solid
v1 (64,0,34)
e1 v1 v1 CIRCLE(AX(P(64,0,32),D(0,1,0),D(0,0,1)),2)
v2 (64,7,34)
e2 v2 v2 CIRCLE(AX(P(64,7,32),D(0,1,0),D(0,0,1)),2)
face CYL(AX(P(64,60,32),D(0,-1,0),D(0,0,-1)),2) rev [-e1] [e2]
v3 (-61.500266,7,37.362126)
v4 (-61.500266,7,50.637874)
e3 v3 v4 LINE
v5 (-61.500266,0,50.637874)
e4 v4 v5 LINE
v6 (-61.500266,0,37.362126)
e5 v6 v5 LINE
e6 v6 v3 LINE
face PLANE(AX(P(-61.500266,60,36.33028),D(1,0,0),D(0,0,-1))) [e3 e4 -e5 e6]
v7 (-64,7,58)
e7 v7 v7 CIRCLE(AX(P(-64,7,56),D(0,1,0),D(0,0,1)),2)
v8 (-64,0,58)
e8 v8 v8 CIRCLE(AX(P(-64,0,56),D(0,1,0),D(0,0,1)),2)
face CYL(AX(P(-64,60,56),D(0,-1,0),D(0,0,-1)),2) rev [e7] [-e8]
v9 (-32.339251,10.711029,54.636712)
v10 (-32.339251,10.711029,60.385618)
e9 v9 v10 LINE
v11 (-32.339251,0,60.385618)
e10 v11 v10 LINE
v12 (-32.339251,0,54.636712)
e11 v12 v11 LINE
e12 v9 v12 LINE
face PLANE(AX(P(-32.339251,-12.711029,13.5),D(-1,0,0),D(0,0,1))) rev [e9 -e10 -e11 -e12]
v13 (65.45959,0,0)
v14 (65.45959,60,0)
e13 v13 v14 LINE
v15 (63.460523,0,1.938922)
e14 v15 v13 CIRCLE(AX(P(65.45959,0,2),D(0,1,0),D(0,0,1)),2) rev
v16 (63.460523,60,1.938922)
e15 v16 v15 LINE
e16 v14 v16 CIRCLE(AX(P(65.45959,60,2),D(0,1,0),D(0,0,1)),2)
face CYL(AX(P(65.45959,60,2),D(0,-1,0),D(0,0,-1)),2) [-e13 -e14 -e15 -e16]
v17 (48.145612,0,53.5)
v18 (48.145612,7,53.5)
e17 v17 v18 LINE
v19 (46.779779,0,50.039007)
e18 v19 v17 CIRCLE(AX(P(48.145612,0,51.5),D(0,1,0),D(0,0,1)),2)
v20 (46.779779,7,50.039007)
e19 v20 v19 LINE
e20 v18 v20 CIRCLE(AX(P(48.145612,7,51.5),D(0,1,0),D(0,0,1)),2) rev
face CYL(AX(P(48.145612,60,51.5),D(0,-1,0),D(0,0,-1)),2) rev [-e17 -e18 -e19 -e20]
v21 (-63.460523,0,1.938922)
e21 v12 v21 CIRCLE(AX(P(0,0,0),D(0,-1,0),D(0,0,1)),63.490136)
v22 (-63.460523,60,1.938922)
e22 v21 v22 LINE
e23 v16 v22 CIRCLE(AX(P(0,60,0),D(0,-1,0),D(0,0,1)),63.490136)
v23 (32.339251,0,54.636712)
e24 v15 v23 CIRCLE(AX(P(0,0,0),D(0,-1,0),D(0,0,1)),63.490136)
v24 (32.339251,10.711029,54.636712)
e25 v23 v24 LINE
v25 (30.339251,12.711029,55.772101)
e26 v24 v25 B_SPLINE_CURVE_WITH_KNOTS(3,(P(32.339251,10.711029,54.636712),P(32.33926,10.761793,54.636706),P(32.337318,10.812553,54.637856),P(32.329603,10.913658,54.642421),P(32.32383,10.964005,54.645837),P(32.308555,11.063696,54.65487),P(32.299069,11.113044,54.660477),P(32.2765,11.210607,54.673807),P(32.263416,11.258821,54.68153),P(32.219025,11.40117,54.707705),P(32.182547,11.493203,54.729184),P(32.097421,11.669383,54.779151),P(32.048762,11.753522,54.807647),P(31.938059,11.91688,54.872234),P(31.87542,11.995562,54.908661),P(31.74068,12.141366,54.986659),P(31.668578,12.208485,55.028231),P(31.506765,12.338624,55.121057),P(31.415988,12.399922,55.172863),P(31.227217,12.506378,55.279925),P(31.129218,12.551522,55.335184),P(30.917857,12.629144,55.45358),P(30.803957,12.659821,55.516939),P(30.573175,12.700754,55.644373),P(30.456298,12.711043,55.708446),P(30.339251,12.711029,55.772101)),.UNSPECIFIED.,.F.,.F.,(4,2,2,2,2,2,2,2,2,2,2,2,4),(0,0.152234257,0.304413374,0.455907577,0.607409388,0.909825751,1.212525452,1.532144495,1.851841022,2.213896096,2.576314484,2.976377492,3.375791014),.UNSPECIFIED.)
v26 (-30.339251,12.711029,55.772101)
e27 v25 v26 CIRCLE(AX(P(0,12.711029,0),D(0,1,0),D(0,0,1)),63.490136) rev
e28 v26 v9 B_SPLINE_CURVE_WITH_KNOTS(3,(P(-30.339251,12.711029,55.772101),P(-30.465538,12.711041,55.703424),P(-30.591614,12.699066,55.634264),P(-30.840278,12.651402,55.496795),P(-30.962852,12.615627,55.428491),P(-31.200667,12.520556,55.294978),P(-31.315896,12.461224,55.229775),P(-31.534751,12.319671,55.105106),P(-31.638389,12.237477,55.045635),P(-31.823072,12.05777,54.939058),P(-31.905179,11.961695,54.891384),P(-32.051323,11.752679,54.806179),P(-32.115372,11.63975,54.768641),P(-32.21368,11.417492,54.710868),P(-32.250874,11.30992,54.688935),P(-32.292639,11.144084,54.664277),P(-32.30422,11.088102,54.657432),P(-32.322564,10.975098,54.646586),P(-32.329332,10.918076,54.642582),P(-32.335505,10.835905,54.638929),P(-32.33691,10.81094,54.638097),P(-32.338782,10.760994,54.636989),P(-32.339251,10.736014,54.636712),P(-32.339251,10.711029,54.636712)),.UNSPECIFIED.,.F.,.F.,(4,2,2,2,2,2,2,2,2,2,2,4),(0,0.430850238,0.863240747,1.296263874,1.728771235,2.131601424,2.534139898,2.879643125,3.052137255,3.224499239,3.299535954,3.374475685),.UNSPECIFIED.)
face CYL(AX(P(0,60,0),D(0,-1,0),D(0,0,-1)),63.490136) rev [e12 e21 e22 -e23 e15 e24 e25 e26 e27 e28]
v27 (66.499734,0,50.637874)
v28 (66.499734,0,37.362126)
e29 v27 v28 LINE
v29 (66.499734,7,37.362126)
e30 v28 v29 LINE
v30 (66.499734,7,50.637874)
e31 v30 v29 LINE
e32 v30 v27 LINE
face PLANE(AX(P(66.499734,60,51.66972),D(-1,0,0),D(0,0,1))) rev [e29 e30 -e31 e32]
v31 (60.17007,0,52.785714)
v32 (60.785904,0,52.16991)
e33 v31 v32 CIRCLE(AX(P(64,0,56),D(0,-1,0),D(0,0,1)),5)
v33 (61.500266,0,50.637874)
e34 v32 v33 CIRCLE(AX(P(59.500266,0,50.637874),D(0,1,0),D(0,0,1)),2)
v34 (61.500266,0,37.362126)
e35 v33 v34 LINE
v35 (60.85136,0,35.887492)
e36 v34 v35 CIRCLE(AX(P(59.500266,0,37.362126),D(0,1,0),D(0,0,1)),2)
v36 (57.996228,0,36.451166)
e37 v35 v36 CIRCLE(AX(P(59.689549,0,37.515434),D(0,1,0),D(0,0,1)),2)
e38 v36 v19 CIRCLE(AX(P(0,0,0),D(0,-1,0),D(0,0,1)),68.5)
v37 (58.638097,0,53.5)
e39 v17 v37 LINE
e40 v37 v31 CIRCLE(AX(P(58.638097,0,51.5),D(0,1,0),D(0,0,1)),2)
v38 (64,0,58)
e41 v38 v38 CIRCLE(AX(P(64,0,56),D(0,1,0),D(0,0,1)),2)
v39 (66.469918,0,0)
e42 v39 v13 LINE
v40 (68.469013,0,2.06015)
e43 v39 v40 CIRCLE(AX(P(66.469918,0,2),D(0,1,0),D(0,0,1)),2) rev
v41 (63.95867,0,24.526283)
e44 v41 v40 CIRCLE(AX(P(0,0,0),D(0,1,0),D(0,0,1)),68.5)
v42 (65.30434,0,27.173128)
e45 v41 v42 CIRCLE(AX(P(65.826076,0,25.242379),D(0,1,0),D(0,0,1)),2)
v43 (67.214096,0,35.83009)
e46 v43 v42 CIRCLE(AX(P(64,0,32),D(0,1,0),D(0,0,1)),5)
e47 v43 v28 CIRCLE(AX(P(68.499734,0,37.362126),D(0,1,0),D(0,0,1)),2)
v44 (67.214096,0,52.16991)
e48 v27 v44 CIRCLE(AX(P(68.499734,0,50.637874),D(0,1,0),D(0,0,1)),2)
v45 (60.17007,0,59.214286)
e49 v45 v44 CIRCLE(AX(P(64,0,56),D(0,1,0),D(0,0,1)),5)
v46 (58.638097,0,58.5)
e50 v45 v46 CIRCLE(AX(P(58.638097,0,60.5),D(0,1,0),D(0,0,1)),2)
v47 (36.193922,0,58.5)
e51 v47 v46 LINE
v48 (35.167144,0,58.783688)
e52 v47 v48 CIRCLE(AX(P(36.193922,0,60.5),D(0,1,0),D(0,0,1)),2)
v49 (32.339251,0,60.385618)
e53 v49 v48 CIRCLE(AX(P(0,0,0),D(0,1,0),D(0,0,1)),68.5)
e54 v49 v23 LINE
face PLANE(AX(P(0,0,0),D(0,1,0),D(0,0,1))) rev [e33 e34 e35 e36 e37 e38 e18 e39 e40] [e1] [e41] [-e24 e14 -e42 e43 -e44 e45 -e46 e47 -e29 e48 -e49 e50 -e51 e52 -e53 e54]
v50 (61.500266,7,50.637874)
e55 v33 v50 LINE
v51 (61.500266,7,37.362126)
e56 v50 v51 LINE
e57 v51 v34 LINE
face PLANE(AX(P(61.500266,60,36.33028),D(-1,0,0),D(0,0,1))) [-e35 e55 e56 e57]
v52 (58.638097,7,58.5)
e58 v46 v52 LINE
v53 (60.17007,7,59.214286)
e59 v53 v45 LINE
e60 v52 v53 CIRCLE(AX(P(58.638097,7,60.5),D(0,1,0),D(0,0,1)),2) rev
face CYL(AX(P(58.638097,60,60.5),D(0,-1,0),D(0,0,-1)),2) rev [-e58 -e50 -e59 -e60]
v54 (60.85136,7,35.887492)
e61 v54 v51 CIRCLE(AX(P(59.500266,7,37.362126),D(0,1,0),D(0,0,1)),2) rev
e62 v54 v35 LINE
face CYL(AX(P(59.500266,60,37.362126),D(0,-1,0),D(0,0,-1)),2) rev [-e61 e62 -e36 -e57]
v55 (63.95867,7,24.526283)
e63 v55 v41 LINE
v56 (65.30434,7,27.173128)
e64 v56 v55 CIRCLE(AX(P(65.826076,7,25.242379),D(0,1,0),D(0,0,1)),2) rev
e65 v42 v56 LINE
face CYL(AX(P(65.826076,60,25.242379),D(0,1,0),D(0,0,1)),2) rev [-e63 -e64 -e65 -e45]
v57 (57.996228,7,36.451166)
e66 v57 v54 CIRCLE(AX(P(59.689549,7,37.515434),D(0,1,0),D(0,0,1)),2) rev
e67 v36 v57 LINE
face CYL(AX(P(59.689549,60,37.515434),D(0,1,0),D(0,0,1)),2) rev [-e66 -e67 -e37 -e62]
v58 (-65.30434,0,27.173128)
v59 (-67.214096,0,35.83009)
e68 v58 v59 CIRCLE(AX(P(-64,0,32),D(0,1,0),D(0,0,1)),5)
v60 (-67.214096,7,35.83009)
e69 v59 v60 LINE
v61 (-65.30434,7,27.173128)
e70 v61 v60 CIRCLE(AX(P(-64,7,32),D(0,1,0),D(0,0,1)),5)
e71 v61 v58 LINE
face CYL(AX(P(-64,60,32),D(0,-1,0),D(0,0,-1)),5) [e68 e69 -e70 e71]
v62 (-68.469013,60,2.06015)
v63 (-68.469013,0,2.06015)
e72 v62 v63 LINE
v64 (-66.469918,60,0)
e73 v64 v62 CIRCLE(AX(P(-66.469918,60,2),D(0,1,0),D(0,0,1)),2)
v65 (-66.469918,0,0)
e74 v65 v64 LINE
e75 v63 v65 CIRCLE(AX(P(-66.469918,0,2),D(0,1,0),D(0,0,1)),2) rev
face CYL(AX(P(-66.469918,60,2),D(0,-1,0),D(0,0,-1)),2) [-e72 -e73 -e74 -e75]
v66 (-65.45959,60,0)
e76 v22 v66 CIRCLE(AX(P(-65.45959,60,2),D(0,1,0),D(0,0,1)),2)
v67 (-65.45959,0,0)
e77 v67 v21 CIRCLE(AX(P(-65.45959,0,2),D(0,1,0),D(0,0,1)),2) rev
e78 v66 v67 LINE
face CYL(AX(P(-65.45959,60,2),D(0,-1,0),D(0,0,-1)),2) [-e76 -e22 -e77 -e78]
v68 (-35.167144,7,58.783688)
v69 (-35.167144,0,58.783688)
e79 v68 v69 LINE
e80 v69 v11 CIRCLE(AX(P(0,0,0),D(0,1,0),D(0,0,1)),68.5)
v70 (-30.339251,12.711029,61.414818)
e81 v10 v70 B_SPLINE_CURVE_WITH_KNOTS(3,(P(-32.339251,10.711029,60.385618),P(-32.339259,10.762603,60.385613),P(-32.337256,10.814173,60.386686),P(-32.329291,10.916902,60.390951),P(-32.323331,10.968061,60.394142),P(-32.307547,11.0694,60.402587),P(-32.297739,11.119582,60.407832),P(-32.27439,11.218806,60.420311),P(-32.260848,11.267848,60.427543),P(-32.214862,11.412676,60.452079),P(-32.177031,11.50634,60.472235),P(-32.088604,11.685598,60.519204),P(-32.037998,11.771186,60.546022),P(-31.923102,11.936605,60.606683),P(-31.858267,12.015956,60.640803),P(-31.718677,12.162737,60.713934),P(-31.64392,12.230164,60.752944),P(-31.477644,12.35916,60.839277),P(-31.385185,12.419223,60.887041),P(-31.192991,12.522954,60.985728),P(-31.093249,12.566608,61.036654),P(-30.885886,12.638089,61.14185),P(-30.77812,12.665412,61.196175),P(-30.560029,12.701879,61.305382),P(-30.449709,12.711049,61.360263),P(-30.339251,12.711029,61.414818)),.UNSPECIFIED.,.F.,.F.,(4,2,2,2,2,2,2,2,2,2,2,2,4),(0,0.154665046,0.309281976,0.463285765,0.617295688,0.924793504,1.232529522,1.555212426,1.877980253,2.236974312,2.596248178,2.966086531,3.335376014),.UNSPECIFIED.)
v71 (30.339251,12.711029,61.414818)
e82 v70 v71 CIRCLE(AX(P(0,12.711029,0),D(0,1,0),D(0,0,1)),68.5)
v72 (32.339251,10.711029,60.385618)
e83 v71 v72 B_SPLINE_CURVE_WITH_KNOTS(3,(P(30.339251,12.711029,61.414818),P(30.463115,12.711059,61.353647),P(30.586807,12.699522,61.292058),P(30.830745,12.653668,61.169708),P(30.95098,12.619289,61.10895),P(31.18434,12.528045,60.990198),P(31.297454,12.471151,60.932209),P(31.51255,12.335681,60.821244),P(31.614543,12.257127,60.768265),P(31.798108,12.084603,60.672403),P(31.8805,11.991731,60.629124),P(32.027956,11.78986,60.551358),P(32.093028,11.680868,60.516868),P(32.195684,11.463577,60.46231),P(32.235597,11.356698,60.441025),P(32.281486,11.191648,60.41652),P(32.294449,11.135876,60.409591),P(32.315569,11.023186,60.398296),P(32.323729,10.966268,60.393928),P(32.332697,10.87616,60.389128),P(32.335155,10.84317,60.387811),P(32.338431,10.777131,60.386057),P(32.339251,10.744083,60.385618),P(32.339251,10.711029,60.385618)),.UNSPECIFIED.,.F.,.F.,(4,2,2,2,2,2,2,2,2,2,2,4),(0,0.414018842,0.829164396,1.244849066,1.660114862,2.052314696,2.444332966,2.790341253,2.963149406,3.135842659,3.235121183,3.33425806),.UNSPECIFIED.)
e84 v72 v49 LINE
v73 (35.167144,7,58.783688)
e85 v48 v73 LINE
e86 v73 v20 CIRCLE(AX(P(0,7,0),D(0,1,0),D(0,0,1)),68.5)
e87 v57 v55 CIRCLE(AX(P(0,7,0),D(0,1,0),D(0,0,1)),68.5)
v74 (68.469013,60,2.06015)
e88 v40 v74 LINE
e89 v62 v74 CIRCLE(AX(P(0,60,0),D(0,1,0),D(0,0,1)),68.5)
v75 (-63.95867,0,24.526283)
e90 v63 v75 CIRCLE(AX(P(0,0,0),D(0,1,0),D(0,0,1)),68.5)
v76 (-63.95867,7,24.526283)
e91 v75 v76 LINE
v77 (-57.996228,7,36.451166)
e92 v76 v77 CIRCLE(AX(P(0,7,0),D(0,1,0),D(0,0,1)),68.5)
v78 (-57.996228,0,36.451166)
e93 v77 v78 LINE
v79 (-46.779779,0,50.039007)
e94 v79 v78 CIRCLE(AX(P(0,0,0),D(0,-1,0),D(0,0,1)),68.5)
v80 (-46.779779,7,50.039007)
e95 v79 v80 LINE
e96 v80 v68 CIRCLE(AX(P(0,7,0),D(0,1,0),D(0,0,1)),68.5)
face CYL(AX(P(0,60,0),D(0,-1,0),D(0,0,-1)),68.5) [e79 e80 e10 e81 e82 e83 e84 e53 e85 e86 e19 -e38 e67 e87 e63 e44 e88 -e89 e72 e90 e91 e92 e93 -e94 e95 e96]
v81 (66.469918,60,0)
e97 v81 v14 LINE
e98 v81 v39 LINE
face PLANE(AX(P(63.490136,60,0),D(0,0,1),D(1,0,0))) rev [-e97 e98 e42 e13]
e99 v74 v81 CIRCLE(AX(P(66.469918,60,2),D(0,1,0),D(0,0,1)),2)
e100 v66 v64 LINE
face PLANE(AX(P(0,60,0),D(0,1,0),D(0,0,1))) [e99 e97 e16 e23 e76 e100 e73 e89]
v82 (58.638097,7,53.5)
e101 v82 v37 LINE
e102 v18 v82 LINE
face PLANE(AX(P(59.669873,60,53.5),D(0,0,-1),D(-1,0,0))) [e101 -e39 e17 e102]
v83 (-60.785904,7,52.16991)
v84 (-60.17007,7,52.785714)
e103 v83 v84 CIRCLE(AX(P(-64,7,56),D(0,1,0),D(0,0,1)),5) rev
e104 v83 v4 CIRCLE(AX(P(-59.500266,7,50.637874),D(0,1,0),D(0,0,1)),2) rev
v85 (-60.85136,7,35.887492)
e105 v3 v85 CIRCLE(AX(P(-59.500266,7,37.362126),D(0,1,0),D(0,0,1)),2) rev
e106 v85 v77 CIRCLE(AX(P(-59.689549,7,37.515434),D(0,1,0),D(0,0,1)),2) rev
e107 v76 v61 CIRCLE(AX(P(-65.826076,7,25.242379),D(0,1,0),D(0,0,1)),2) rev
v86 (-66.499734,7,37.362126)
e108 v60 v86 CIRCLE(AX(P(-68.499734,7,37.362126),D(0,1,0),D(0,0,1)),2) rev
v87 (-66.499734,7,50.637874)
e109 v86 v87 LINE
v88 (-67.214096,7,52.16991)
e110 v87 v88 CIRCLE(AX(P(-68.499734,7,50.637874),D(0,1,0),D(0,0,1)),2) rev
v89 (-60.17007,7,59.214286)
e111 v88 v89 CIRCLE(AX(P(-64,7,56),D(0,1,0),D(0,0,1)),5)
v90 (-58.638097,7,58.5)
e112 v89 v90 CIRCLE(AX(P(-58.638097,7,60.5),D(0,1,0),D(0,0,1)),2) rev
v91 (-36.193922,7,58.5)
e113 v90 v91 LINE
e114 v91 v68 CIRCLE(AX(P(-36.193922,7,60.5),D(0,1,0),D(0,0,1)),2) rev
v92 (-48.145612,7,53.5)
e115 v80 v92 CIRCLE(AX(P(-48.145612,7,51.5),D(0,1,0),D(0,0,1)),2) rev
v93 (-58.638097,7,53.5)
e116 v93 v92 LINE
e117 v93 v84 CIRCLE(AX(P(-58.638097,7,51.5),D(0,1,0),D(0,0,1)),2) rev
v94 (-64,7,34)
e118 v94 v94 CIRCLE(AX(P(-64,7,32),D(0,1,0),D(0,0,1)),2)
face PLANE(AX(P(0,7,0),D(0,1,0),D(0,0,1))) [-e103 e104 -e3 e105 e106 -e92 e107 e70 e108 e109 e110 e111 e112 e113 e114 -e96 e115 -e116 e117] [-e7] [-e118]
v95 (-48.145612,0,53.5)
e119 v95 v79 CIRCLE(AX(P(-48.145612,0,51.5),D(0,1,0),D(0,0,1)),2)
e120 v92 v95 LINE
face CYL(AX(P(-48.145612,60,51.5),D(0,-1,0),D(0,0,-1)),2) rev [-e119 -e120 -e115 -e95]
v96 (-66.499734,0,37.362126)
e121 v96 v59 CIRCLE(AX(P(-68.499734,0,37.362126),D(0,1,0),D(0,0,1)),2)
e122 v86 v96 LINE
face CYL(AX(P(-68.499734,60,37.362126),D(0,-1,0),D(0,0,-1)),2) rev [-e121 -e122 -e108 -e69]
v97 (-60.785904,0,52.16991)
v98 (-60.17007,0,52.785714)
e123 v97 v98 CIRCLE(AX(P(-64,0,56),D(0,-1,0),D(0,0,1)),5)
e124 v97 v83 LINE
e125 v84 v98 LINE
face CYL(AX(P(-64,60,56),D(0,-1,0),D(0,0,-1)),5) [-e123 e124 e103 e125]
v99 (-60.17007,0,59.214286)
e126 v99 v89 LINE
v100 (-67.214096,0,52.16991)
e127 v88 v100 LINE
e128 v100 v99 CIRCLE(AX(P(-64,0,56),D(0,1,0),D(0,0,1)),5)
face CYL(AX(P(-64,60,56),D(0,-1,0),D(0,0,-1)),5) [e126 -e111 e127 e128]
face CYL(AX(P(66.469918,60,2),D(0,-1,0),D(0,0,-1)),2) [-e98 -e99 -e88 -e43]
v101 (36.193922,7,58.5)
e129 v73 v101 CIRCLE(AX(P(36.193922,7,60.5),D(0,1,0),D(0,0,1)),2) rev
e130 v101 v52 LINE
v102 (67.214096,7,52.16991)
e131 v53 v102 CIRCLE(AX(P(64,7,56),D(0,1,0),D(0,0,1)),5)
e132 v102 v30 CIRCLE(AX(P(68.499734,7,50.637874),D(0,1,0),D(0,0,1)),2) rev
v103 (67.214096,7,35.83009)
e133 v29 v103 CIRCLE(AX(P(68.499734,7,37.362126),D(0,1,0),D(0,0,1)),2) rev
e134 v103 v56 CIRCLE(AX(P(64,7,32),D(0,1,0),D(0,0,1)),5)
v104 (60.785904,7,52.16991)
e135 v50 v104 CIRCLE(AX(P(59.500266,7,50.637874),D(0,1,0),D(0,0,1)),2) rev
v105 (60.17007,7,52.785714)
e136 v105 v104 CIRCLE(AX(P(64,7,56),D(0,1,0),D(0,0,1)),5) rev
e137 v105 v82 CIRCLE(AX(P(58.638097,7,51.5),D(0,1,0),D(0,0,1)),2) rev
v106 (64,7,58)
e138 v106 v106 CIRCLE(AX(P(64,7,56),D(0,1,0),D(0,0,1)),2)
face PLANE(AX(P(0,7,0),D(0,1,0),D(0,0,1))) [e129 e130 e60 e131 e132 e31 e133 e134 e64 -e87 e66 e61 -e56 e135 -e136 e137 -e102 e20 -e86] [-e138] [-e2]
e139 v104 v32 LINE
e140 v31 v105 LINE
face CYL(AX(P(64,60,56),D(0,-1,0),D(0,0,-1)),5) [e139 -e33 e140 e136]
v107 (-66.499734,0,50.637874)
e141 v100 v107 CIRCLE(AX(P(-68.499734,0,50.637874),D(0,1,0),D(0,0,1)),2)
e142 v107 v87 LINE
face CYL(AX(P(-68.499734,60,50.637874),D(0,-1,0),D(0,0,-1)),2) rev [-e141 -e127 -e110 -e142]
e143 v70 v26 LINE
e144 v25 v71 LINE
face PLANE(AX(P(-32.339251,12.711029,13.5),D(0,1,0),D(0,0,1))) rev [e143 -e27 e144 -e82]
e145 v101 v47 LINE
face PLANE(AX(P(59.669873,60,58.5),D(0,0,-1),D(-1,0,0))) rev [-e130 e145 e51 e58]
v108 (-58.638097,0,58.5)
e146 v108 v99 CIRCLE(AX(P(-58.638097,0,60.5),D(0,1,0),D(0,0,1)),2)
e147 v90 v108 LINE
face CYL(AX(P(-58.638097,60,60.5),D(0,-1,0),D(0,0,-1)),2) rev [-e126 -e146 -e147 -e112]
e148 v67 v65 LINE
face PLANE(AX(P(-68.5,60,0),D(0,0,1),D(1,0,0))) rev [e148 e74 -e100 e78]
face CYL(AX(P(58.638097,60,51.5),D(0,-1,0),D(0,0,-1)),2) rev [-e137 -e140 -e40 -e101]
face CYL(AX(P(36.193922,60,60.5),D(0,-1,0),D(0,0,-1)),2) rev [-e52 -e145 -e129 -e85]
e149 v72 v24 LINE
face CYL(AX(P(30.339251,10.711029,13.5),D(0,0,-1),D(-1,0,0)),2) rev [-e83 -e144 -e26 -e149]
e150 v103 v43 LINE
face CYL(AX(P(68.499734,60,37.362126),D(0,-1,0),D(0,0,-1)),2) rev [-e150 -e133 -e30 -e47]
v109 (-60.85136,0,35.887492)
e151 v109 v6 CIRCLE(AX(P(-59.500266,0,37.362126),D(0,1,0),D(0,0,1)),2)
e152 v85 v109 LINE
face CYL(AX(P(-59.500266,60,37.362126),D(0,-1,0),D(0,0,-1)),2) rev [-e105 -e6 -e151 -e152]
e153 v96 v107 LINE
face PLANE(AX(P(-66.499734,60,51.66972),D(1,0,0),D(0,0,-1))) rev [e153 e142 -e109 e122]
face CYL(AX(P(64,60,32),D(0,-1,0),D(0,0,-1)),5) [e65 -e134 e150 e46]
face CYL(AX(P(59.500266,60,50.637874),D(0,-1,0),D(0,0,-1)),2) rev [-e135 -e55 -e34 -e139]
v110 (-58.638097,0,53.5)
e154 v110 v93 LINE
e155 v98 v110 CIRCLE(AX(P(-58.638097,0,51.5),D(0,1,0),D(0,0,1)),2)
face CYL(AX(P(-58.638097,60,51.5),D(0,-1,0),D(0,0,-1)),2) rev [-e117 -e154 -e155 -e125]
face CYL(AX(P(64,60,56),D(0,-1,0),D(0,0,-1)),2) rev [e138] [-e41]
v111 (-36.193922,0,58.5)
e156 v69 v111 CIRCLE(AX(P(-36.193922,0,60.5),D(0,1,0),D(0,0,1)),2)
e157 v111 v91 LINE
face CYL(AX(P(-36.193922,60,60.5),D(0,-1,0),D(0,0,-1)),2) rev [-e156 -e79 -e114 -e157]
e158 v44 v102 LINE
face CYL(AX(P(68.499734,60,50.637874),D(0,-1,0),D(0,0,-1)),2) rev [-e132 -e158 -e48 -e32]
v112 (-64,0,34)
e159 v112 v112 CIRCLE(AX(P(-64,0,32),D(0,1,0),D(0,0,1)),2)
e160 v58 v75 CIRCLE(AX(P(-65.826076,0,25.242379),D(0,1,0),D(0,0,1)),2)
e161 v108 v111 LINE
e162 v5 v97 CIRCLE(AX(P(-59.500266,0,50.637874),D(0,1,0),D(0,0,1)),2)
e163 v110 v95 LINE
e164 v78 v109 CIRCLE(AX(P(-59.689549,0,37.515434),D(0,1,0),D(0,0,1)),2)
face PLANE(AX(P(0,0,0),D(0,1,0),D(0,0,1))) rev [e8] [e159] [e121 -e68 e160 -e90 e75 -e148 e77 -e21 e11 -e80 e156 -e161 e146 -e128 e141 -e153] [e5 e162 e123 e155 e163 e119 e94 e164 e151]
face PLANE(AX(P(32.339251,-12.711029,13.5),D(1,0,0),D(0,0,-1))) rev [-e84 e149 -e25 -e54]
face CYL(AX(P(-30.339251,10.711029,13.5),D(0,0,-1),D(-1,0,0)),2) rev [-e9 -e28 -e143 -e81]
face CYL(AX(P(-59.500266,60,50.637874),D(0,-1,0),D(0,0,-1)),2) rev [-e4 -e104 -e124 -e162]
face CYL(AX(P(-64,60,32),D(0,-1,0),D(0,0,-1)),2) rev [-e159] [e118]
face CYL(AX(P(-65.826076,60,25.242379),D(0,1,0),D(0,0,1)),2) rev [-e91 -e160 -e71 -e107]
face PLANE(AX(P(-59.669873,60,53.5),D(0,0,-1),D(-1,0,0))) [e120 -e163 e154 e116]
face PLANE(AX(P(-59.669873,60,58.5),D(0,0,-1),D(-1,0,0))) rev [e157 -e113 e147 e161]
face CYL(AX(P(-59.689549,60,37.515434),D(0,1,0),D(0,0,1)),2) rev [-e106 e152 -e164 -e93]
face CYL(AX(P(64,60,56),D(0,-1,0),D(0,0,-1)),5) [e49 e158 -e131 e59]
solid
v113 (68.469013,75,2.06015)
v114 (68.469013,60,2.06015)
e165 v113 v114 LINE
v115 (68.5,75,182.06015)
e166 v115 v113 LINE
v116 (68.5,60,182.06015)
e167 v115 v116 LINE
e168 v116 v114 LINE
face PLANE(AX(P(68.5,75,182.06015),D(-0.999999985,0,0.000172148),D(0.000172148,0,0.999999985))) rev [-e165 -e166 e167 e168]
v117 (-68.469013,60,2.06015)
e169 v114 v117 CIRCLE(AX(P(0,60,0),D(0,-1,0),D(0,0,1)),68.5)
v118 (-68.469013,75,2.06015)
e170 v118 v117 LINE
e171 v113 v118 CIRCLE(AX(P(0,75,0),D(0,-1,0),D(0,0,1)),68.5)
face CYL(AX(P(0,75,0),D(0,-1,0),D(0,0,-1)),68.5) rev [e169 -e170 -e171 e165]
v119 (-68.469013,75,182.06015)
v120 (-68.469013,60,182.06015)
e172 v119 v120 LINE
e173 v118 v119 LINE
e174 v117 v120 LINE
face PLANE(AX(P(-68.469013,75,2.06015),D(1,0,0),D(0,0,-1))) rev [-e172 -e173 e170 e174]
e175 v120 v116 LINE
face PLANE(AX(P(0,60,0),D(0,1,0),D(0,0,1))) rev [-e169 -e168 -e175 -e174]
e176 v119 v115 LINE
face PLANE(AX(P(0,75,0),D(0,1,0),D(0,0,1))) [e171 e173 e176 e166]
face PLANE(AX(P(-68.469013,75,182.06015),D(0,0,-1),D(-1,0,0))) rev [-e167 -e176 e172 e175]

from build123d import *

# Parameters (mm, degrees)
SKETCH1_R           = 2
BOSS_EXTRUDE1_DEPTH = 60
CUT_EXTRUDE1_START  = -53
SKETCH2_R           = 90.041166502
SKETCH2_R_2         = 68.5
CUT_EXTRUDE1_DEPTH  = 53
SKETCH3_W           = 64.67850159
SKETCH3_H           = 25.422058074
CUT_EXTRUDE2_DEPTH  = 55
FILLET1_R           = 2
BOSS_EXTRUDE2_DEPTH = 15


with BuildPart() as part:
    # Sketch1 → Boss-Extrude1 (new body)
    with BuildSketch(Plane(origin=(0, 0, 0), x_dir=(1, 0, 0), z_dir=(0, 1, 0))):
        with BuildLine():
            Line((63.490136384, 0), (68.5, 0))
            ThreePointArc((68.5, 0), (67.085865229, -13.846901692), (62.90184857, -27.122084109))
            ThreePointArc((62.90184857, -27.122084109), (68.657126641, -30.180337544), (66.499734232, -36.330280449))
            Line((66.499734232, -36.330280449), (66.499734232, -51.669719551))
            ThreePointArc((66.499734232, -51.669719551), (67.535642402, -59.535425407), (59.669872981, -58.5))
            Line((59.669872981, -58.5), (35.637059362, -58.5))
            ThreePointArc((35.637059362, -58.5), (0, -68.5), (-35.637059362, -58.5))
            Line((-35.637059362, -58.5), (-59.669872981, -58.5))
            ThreePointArc((-59.669872981, -58.5), (-67.535642402, -59.535425407), (-66.499734232, -51.669719551))
            Line((-66.499734232, -51.669719551), (-66.499734232, -36.330280449))
            ThreePointArc((-66.499734232, -36.330280449), (-68.657126641, -30.180337544), (-62.90184857, -27.122084109))
            ThreePointArc((-62.90184857, -27.122084109), (-67.085865229, -13.846901692), (-68.5, 0))
            Line((-68.5, 0), (-63.490136384, 0))
            ThreePointArc((-63.490136384, 0), (0, -63.490136384), (63.490136384, 0))
        make_face()
        with Locations(Location((-64, -32, 0), (0, 0, 270))):
            Circle(SKETCH1_R, mode=Mode.SUBTRACT)
        with Locations(Location((64, -32, 0), (0, 0, 270))):
            Circle(SKETCH1_R, mode=Mode.SUBTRACT)
        with Locations(Location((64, -56, 0), (0, 0, 270))):
            Circle(SKETCH1_R, mode=Mode.SUBTRACT)
        with Locations(Location((-64, -56, 0), (0, 0, 270))):
            Circle(SKETCH1_R, mode=Mode.SUBTRACT)
        with BuildLine():
            Line((61.500265768, -36.330280449), (61.500265768, -51.669719551))
            ThreePointArc((61.500265768, -51.669719551), (60.464574593, -52.464357598), (59.669872981, -53.5))
            Line((59.669872981, -53.5), (42.778499272, -53.5))
            ThreePointArc((42.778499272, -53.5), (52.025817799, -44.55967103), (59.43877643, -34.048228391))
            ThreePointArc((59.43877643, -34.048228391), (60.289714071, -35.35168291), (61.500265768, -36.330280449))
        make_face(mode=Mode.SUBTRACT)
        with BuildLine():
            Line((-59.669872981, -53.5), (-42.778499272, -53.5))
            ThreePointArc((-42.778499272, -53.5), (-52.025817799, -44.55967103), (-59.43877643, -34.048228391))
            ThreePointArc((-59.43877643, -34.048228391), (-60.289714071, -35.35168291), (-61.500265768, -36.330280449))
            Line((-61.500265768, -36.330280449), (-61.500265768, -51.669719551))
            ThreePointArc((-61.500265768, -51.669719551), (-60.464574593, -52.464357598), (-59.669872981, -53.5))
        make_face(mode=Mode.SUBTRACT)
    extrude(amount=BOSS_EXTRUDE1_DEPTH)

    # Sketch2 → Cut-Extrude1 (cut)
    with BuildSketch(Plane(origin=(0, 60, 0), x_dir=(1, 0, 0), z_dir=(0, 1, 0)).offset(CUT_EXTRUDE1_START)):
        Circle(SKETCH2_R)
        Circle(SKETCH2_R_2, mode=Mode.SUBTRACT)
    extrude(amount=CUT_EXTRUDE1_DEPTH, mode=Mode.SUBTRACT)

    # Sketch3 → Cut-Extrude2 (cut)
    with BuildSketch(Plane(origin=(0, 60, 68.5), x_dir=(1, 0, 0), z_dir=(0, 0, 1))):
        with Locations((0, -60)):
            Rectangle(SKETCH3_W, SKETCH3_H)
    extrude(amount=-CUT_EXTRUDE2_DEPTH, mode=Mode.SUBTRACT)

    # Fillet1
    # the kernel refuses this fillet: 2 mm, written as the material it adds along each edge
    with BuildSketch(Plane(origin=(62.90184857, 0, 27.122084109), x_dir=(0.9997743783027363, 0, 0.02124129208351232), z_dir=(0, 1, 0))) as fillet1_piece_1:
        with BuildLine():
            CenterArc((2.883640558, 1.941395669), FILLET1_R, 160.236767208, 95.858786022)
            ThreePointArc((1.001444665, 2.617663827), (0.514111494, 1.303709596), (0, 0))
            ThreePointArc((0, 0), (1.201516899, 0.146510828), (2.403033798, 0))
        make_face()
    extrude(amount=7)
    with BuildSketch(Plane(origin=(66.499734232, 0, 36.330280449), x_dir=(0.8191578281035011, 0, -0.5735681761192429), z_dir=(0, 1, 0)), Plane(origin=(-66.499734232, 0, 51.669719551), x_dir=(-0.8191578281038059, 0, 0.5735681761188076), z_dir=(0, 1, 0))) as fillet1_piece_2:
        with BuildLine():
            CenterArc((1.046482067, -1.992380453), FILLET1_R, 95.002938786, 49.997638975)
            Line((-0.591833589, -0.845244101), (0, 0))
            ThreePointArc((0, 0), (0.436034195, -0.019048868), (0.87206839, 0))
        make_face()
    extrude(amount=7)
    with BuildSketch(Plane(origin=(66.499734232, 0, 51.669719551), x_dir=(0, 0, -1), z_dir=(0, 1, 0)), Plane(origin=(-66.499734232, 0, 36.330280449), x_dir=(0, 0, 1), z_dir=(0, 1, 0))) as fillet1_piece_3:
        with BuildLine():
            CenterArc((1.031845234, -2), FILLET1_R, 90, 49.997638975)
            ThreePointArc((-0.500190676, -0.714361648), (-0.234491309, -0.368106648), (0, 0))
            Line((0, 0), (1.031845234, 0))
        make_face()
    extrude(amount=7)
    with BuildSketch(Plane(origin=(59.669872981, 0, 58.5), x_dir=(0.5736136140260999, 0, 0.8191260109433204), z_dir=(0, 1, 0))) as fillet1_piece_4:
        with BuildLine():
            CenterArc((1.046411475, -1.992381483), FILLET1_R, 95.002600442, 49.994799115)
            Line((-0.591840547, -0.845154255), (0, 0))
            ThreePointArc((0, 0), (0.436004781, -0.019046293), (0.872009562, 0))
        make_face()
    extrude(amount=7)
    with BuildSketch(Plane(origin=(35.637059362, 0, 58.5), x_dir=(1, 0, 0), z_dir=(0, 1, 0))) as fillet1_piece_5:
        with BuildLine():
            CenterArc((0.556862779, -2), FILLET1_R, 90, 30.889831942)
            ThreePointArc((-0.469915154, -0.283687943), (-0.234673418, -0.142314667), (0, 0))
            Line((0, 0), (0.556862779, 0))
        make_face()
    extrude(amount=7)
    with BuildSketch(Plane(origin=(-35.637059362, 0, 58.5), x_dir=(0.85609218491347, 0, 0.5168231524710181), z_dir=(0, 1, 0))) as fillet1_piece_6:
        with BuildLine():
            CenterArc((0.556920432, -1.999983947), FILLET1_R, 90.229563134, 30.889831942)
            Line((-0.476725873, -0.287799577), (0, 0))
            ThreePointArc((0, 0), (0.274453594, -0.000549818), (0.548907188, 0))
        make_face()
    extrude(amount=7)
    with BuildSketch(Plane(origin=(-59.669872981, 0, 58.5), x_dir=(1, 0, 0), z_dir=(0, 1, 0))) as fillet1_piece_7:
        with BuildLine():
            CenterArc((1.031775628, -2), FILLET1_R, 90, 49.994799115)
            ThreePointArc((-0.500196557, -0.714285714), (-0.234496964, -0.36806807), (0, 0))
            Line((0, 0), (1.031775628, 0))
        make_face()
    extrude(amount=7)
    with BuildSketch(Plane(origin=(-62.90184857, 0, 27.122084109), x_dir=(-0.3770742927095456, 0, -0.9261830152716016), z_dir=(0, 1, 0))) as fillet1_piece_8:
        with BuildLine():
            CenterArc((2.843602303, 1.999581444), FILLET1_R, 172.968999754, 95.858786022)
            ThreePointArc((0.858642167, 2.244394142), (0.566159793, 1.069846424), (0, 0))
            ThreePointArc((0, 0), (1.401343581, 0.014335543), (2.802687162, 0))
        make_face()
    extrude(amount=7)
    with BuildSketch(Plane(origin=(32.339250795, 12.711029037, 65.385617973), x_dir=(-1, 0, 0), z_dir=(0, 0, -1))) as fillet1_piece_9_section:
        with BuildLine():
            CenterArc((FILLET1_R, -FILLET1_R), FILLET1_R, 90, 90)
            Line((0, -FILLET1_R), (0, 0))
            Line((0, 0), (FILLET1_R, 0))
        make_face()
    fillet1_piece_9 = extrude(amount=15.748906176, mode=Mode.PRIVATE)
    fillet1_piece_9 = fillet1_piece_9 & Plane(origin=(0, 12.25719498, 0), x_dir=(1, 0, 0), z_dir=(0, -1, 0)) * Cylinder(68.5, 40, mode=Mode.PRIVATE)
    fillet1_piece_9 = fillet1_piece_9 - Plane(origin=(0, 12.25719498, 0), x_dir=(-1, 0, 0), z_dir=(0, -1, 0)) * Cylinder(63.490136384, 40, mode=Mode.PRIVATE)
    add(fillet1_piece_9)
    with BuildSketch(Plane(origin=(-32.339250795, 12.711029037, 65.385617973), x_dir=(1, 0, 0), z_dir=(0, 0, -1))) as fillet1_piece_10_section:
        with BuildLine():
            CenterArc((FILLET1_R, FILLET1_R), FILLET1_R, 180, 90)
            Line((0, FILLET1_R), (0, 0))
            Line((0, 0), (FILLET1_R, 0))
        make_face()
    fillet1_piece_10 = extrude(amount=15.748906176, mode=Mode.PRIVATE)
    fillet1_piece_10 = fillet1_piece_10 & Plane(origin=(0, 12.25719498, 0), x_dir=(1, 0, 0), z_dir=(0, -1, 0)) * Cylinder(68.5, 40, mode=Mode.PRIVATE)
    fillet1_piece_10 = fillet1_piece_10 - Plane(origin=(0, 12.25719498, 0), x_dir=(-1, 0, 0), z_dir=(0, -1, 0)) * Cylinder(63.490136384, 40, mode=Mode.PRIVATE)
    add(fillet1_piece_10)
    with BuildSketch(Plane(origin=(-61.500265768, 0, 36.330280449), x_dir=(0, 0, 1), z_dir=(0, 1, 0)), Plane(origin=(61.500265768, 0, 51.669719551), x_dir=(0, 0, -1), z_dir=(0, 1, 0))) as fillet1_piece_11:
        with BuildLine():
            CenterArc((1.031845234, 2), FILLET1_R, 220.002361025, 49.997638975)
            ThreePointArc((-0.500190676, 0.714361648), (-0.234491309, 0.368106648), (0, 0))
            Line((0, 0), (1.031845234, 0))
        make_face()
    extrude(amount=7)
    with BuildSketch(Plane(origin=(-61.500265768, 0, 51.669719551), x_dir=(0.8191578281038006, 0, 0.5735681761188153), z_dir=(0, 1, 0)), Plane(origin=(61.500265768, 0, 36.330280449), x_dir=(-0.8191578281034525, 0, -0.5735681761193124), z_dir=(0, 1, 0))) as fillet1_piece_12:
        with BuildLine():
            CenterArc((1.046482067, 1.992380453), FILLET1_R, 214.999422238, 49.997638975)
            Line((-0.591833589, 0.845244101), (0, 0))
            ThreePointArc((0, 0), (0.436034195, 0.019048868), (0.87206839, 0))
        make_face()
    extrude(amount=7)
    with BuildSketch(Plane(origin=(-59.43877643, 0, 34.048228391), x_dir=(0.514701836591563, 0, 0.8573692433305922), z_dir=(0, 1, 0))) as fillet1_piece_13:
        with BuildLine():
            CenterArc((2.843602303, -1.999581444), FILLET1_R, 91.172214224, 95.858786022)
            ThreePointArc((0.858642167, -2.244394142), (0.566159793, -1.069846424), (0, 0))
            ThreePointArc((0, 0), (1.401343581, -0.014335543), (2.802687162, 0))
        make_face()
    extrude(amount=7)
    with BuildSketch(Plane(origin=(-42.778499272, 0, 53.5), x_dir=(-0.7563233086110386, 0, -0.6541980226595399), z_dir=(0, 1, 0))) as fillet1_piece_14:
        with BuildLine():
            CenterArc((5.367668856, 1.998508223), FILLET1_R, 130.858867725, 136.928029694)
            Line((4.05927281, 3.51115484), (0, 0))
            ThreePointArc((0, 0), (2.645218105, 0.051093353), (5.29043621, 0))
        make_face()
    extrude(amount=7)
    with BuildSketch(Plane(origin=(-59.669872981, 0, 53.5), x_dir=(1, 0, 0), z_dir=(0, 1, 0))) as fillet1_piece_15:
        with BuildLine():
            CenterArc((1.031775628, 2), FILLET1_R, 220.005200885, 49.994799115)
            ThreePointArc((-0.500196557, 0.714285714), (-0.234496964, 0.36806807), (0, 0))
            Line((0, 0), (1.031775628, 0))
        make_face()
    extrude(amount=7)
    with BuildSketch(Plane(origin=(59.669872981, 0, 53.5), x_dir=(0.5736136140255318, 0, -0.8191260109437182), z_dir=(0, 1, 0))) as fillet1_piece_16:
        with BuildLine():
            CenterArc((1.046411475, 1.992381483), FILLET1_R, 215.002600442, 49.994799115)
            Line((-0.591840547, 0.845154255), (0, 0))
            ThreePointArc((0, 0), (0.436004781, 0.019046293), (0.872009562, 0))
        make_face()
    extrude(amount=7)
    with BuildSketch(Plane(origin=(42.778499272, 0, 53.5), x_dir=(0.7563233086109976, 0, -0.654198022659587), z_dir=(0, 1, 0))) as fillet1_piece_17:
        with BuildLine():
            CenterArc((5.367668856, -1.998508223), FILLET1_R, 92.213102581, 136.928029694)
            Line((4.05927281, -3.51115484), (0, 0))
            ThreePointArc((0, 0), (2.645218105, -0.051093353), (5.29043621, 0))
        make_face()
    extrude(amount=7)
    with BuildSketch(Plane(origin=(59.43877643, 0, 34.048228391), x_dir=(0.6168576606483469, 0, 0.7870747273921637), z_dir=(0, 1, 0))) as fillet1_piece_18:
        with BuildLine():
            CenterArc((2.883640558, -1.941395669), FILLET1_R, 103.904446769, 95.858786022)
            ThreePointArc((1.001444665, -2.617663827), (0.514111494, -1.303709596), (0, 0))
            ThreePointArc((0, 0), (1.201516899, -0.146510828), (2.403033798, 0))
        make_face()
    extrude(amount=7)
    # the kernel refuses this fillet: 2 mm, written as the material it takes off along each edge
    with BuildSketch(Plane(origin=(63.490136384, -4.923634816, 0), x_dir=(1, 0, 0), z_dir=(0, 1, 0))) as fillet1_2_piece_1:
        with BuildLine():
            CenterArc((1.969453926, -2), FILLET1_R, 90, 88.249974963)
            ThreePointArc((-0.029613229, -1.9389221), (-0.007403739, -0.969574114), (0, 0))
            Line((0, 0), (1.969453926, 0))
        make_face()
    extrude(amount=69.847269632, mode=Mode.SUBTRACT)
    with BuildSketch(Plane(origin=(68.5, 65.150958496, 0), x_dir=(-1, 0, 0), z_dir=(0, -1, 0)), Plane(origin=(-68.5, -5.150958496, 0), x_dir=(1, 0, 0), z_dir=(0, 1, 0))) as fillet1_2_piece_2:
        with BuildLine():
            CenterArc((2.030081992, -2), FILLET1_R, 90, 91.723441219)
            ThreePointArc((0.030986713, -2.060150376), (0.007747116, -1.030191699), (0, 0))
            Line((0, 0), (2.030081992, 0))
        make_face()
    extrude(amount=70.301916991, mode=Mode.SUBTRACT)
    with BuildSketch(Plane(origin=(-63.490136384, -4.923634816, 0), x_dir=(-1, 0, 0), z_dir=(0, 1, 0))) as fillet1_2_piece_3:
        with BuildLine():
            CenterArc((1.969453926, 2), FILLET1_R, 181.750025037, 88.249974963)
            ThreePointArc((-0.029613229, 1.9389221), (-0.007403739, 0.969574114), (0, 0))
            Line((0, 0), (1.969453926, 0))
        make_face()
    extrude(amount=69.847269632, mode=Mode.SUBTRACT)


with BuildPart() as body_2:
    # Sketch4 → Boss-Extrude2 (new body)
    with BuildSketch(Plane(origin=(0, 60, 0), x_dir=(1, 0, 0), z_dir=(0, 1, 0))):
        with BuildLine():
            Line((-68.469013287, -2.060150376), (-68.469013287, -182.060150376))
            Line((-68.469013287, -182.060150376), (68.5, -182.060150376))
            Line((68.5, -182.060150376), (68.469013287, -2.060150376))
            ThreePointArc((68.469013287, -2.060150376), (0, -68.5), (-68.469013287, -2.060150376))
        make_face()
    extrude(amount=BOSS_EXTRUDE2_DEPTH)


solid = Compound([part.part, body_2.part])
